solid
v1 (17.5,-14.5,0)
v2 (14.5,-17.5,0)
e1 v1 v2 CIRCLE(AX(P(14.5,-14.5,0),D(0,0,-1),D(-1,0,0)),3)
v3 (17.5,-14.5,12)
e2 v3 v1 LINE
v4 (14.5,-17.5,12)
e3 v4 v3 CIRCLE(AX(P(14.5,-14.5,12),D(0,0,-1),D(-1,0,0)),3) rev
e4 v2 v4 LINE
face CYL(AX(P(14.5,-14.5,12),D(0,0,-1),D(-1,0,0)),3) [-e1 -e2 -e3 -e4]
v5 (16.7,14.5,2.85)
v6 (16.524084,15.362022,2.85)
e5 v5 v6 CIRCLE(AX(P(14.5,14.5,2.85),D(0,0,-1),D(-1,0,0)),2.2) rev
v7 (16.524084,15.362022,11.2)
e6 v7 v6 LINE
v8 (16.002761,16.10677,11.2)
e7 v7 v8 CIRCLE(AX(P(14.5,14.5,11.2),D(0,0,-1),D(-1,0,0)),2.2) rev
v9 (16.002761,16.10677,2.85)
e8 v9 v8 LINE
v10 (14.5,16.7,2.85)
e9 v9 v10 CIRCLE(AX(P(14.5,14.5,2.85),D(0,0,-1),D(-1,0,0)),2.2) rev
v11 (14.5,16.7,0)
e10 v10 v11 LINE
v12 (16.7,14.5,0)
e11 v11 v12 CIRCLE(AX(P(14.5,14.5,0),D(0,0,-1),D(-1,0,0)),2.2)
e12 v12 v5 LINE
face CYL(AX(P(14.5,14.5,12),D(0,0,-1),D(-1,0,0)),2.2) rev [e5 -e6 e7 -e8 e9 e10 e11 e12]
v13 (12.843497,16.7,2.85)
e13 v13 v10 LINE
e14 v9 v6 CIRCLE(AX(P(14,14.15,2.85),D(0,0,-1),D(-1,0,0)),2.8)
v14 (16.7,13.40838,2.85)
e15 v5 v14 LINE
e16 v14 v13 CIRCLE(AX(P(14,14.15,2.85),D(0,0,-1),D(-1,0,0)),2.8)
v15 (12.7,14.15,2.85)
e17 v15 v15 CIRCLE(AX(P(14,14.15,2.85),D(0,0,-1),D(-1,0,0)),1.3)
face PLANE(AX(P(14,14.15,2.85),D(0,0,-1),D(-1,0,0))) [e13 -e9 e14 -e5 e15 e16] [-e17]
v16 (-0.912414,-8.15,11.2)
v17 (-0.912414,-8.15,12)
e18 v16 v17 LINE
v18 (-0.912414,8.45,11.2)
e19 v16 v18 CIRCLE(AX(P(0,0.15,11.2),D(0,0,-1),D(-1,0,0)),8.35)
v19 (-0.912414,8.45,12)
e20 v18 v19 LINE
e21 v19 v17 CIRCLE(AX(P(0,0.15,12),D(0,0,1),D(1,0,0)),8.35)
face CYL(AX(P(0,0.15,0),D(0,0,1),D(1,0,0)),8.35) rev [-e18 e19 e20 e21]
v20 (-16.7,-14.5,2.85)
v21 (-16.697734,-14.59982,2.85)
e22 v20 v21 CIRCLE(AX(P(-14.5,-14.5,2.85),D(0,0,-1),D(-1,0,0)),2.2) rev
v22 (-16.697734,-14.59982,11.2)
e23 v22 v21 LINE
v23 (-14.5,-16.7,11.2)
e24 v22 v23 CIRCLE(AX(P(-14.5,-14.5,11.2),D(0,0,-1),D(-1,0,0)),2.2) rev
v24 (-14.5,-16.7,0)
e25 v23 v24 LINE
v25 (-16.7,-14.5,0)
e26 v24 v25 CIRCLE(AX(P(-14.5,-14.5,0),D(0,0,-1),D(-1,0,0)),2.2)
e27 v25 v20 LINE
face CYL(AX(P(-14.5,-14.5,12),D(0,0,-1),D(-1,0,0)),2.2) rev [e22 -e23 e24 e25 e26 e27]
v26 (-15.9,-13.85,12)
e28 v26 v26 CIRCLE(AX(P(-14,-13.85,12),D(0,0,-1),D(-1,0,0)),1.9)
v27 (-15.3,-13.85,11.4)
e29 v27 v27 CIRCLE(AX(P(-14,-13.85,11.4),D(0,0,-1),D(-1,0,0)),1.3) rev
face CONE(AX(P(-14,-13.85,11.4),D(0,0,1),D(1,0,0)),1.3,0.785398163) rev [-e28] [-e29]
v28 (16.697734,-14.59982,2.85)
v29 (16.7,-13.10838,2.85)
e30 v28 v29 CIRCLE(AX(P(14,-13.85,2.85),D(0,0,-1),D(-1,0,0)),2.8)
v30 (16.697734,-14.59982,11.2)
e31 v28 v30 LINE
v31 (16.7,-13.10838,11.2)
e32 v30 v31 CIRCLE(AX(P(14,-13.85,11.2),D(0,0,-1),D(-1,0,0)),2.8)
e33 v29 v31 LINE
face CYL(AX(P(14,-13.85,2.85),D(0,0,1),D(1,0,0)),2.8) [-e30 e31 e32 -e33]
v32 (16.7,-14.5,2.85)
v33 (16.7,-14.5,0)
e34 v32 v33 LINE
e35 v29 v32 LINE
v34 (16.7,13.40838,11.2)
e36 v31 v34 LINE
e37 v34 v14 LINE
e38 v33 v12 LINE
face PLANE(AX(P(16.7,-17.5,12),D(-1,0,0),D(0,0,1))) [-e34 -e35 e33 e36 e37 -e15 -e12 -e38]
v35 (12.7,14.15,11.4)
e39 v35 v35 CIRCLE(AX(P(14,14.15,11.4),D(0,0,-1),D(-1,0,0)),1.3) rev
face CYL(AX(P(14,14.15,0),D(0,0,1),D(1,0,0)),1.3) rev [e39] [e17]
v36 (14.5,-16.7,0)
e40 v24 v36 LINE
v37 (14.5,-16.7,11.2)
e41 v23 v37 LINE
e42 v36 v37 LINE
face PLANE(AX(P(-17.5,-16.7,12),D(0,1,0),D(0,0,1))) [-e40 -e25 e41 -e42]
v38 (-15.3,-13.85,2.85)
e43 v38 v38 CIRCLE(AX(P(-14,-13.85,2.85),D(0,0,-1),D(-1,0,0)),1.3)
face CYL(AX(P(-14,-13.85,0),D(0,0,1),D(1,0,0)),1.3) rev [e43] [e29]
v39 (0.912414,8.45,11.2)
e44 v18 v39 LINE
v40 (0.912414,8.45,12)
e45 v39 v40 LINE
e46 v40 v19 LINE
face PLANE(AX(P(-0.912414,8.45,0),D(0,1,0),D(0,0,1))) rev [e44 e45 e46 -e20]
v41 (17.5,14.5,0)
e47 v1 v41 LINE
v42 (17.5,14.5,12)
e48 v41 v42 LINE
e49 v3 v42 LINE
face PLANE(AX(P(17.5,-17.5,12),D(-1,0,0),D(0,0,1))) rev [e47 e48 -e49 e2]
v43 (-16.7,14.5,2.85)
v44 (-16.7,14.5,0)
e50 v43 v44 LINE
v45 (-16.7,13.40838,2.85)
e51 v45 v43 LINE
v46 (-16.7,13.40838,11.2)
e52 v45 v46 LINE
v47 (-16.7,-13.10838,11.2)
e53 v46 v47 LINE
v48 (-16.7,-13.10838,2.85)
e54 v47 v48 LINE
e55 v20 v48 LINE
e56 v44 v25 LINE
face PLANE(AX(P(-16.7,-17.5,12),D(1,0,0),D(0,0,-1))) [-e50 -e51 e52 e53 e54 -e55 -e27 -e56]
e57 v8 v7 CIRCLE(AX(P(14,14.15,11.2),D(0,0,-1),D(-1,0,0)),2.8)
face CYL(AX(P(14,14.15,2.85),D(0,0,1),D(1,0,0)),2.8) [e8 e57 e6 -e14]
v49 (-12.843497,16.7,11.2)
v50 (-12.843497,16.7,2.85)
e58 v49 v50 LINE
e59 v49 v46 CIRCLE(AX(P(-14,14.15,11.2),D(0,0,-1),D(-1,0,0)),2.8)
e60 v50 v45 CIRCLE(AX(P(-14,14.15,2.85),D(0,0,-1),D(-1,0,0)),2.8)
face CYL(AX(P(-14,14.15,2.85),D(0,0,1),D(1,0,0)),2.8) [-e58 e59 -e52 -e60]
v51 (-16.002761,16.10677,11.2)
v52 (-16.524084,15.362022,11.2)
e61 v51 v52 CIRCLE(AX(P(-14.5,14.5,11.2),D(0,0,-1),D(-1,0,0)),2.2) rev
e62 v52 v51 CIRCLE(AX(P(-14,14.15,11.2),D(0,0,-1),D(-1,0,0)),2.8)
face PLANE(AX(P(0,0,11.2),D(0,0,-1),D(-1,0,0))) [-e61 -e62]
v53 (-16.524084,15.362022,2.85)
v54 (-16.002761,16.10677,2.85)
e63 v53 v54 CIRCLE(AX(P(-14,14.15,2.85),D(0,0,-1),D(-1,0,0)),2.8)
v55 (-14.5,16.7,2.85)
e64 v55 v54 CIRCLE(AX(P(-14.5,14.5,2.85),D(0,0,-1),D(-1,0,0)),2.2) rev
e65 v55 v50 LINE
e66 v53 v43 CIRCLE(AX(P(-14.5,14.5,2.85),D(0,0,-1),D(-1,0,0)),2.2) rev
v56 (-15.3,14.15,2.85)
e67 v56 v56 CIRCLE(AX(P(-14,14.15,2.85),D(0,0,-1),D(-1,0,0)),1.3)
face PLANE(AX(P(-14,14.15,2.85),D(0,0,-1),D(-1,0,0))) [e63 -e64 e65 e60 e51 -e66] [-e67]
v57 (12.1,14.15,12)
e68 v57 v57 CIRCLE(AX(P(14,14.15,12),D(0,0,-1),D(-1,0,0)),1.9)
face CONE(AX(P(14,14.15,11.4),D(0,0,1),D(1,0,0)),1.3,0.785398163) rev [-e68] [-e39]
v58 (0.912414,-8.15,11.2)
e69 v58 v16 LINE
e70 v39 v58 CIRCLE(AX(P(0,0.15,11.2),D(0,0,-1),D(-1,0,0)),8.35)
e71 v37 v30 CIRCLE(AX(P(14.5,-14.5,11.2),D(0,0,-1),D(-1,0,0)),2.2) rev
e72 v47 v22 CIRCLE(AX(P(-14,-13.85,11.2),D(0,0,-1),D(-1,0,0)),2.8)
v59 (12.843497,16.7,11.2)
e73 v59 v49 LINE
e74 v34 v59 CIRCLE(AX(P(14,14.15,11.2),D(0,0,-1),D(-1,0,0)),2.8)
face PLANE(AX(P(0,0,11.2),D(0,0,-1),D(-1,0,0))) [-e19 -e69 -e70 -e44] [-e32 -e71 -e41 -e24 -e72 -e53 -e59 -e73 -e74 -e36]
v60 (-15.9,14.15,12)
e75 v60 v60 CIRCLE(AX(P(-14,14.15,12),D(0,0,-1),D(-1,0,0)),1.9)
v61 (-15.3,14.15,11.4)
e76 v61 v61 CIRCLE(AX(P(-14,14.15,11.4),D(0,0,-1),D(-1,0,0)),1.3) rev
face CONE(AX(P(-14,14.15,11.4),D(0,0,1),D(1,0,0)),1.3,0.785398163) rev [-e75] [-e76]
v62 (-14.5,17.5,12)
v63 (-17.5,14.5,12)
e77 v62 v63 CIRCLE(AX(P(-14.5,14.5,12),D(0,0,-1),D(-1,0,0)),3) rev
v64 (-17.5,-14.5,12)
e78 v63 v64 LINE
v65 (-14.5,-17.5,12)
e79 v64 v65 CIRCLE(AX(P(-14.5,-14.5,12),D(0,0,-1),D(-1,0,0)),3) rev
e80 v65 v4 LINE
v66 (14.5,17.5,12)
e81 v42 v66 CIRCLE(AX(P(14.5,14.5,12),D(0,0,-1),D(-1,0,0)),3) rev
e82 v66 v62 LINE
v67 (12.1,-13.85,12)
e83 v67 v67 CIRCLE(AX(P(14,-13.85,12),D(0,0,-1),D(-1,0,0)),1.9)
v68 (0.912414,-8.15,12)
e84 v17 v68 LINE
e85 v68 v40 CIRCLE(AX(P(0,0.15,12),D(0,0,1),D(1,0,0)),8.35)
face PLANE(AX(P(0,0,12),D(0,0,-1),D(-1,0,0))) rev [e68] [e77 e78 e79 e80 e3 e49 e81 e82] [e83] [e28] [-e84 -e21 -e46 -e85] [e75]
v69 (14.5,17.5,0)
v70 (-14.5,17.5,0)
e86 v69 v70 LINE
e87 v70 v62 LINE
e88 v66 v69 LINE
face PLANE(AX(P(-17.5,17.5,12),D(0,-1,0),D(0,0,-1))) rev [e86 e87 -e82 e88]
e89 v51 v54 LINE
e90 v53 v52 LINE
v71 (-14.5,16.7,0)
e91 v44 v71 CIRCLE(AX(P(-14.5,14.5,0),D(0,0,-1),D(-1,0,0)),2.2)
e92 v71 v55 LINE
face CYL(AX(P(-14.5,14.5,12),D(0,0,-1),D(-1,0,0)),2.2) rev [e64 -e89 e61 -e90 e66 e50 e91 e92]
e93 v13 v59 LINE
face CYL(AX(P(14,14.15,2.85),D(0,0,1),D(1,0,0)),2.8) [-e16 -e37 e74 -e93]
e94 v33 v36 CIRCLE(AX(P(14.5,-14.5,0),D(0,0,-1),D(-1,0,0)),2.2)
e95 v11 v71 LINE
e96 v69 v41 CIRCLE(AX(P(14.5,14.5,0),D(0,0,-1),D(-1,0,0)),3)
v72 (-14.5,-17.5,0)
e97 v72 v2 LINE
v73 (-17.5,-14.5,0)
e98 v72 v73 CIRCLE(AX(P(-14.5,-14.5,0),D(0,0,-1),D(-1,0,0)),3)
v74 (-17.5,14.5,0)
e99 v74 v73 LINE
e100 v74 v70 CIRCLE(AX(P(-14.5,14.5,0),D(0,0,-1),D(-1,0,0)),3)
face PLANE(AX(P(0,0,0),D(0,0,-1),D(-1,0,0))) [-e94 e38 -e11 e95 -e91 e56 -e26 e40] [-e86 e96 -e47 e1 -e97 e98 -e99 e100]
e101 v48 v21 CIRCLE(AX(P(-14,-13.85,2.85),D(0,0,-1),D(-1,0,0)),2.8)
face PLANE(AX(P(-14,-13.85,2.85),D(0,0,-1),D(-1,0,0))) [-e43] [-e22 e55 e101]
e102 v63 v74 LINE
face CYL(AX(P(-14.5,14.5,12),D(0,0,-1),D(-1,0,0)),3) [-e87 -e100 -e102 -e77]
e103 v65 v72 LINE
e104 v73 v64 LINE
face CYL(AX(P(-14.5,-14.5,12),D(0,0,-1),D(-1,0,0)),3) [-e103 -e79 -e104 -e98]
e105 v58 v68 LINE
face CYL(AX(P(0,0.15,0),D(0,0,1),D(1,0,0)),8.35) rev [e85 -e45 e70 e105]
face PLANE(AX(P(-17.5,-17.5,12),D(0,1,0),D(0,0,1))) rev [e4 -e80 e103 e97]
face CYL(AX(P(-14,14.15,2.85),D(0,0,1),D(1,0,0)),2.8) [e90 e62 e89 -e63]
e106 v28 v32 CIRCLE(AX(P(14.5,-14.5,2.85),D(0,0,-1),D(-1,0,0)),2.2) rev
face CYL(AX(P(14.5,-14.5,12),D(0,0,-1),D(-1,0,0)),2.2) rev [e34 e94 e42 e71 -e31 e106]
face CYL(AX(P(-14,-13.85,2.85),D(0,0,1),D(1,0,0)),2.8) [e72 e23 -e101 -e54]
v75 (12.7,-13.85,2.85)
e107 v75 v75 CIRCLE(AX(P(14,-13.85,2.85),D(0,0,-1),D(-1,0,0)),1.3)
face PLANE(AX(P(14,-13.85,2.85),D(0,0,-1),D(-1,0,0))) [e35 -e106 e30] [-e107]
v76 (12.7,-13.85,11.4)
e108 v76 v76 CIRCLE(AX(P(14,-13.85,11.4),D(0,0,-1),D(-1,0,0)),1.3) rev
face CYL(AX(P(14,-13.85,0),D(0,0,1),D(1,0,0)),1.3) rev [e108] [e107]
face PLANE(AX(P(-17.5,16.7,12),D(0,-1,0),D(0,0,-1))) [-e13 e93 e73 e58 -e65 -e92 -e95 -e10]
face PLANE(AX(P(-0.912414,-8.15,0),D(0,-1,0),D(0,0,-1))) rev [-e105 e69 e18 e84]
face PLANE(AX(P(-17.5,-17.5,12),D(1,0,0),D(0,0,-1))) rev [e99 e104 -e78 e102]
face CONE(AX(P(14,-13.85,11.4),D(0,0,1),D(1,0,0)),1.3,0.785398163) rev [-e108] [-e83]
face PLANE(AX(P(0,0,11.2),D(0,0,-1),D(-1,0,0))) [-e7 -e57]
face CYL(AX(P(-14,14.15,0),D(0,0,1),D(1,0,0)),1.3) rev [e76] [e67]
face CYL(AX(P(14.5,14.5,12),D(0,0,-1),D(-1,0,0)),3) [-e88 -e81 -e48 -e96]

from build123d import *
from build123d.topology import SkipClean

# Parameters (mm, degrees)
CROQUIS2_W              = 35
CROQUIS2_H              = 35
SALIENTE_EXTRUIR1_DEPTH = 12
REDONDEO1_R             = 3
VACIADO1_T              = -0.8
CORTAR_EXTRUIR3_DEPTH   = 28.504545079
CROQUIS6_R              = 1.3
CORTAR_EXTRUIR4_DEPTH   = 28.504545079
CHAFL_N3_SIZE           = 0.6
CROQUIS7_R              = 2.8
CROQUIS7_R_2            = 1.3
SALIENTE_EXTRUIR2_DEPTH = 8.35


with BuildPart() as part:
    # Croquis2 → Saliente-Extruir1 (new body)
    with BuildSketch(Plane.XY):
        Rectangle(CROQUIS2_W, CROQUIS2_H)
    extrude(amount=SALIENTE_EXTRUIR1_DEPTH)

    # Redondeo1
    redondeo1_edges = [part.edges().sort_by_distance(p)[0] for p in [
        (17.5, -17.5, 6),
        (-17.5, -17.5, 6),
        (-17.5, 17.5, 6),
        (17.5, 17.5, 6),
    ]]
    fillet(redondeo1_edges, radius=REDONDEO1_R)

    # Vaciado1
    vaciado1_openings = [part.faces().sort_by_distance(p)[0] for p in [
        (0, 0, 0),
    ]]
    offset(amount=VACIADO1_T, openings=vaciado1_openings, kind=Kind.INTERSECTION)

    # Croquis5 → Cortar-Extruir3 (cut, through all)
    with BuildSketch(Plane.XY.offset(12)):
        with BuildLine():
            Line((-0.91241438, 8.45), (0.91241438, 8.45))
            ThreePointArc((0.91241438, 8.45), (8.35, 0.15), (0.91241438, -8.15))
            Line((0.91241438, -8.15), (-0.91241438, -8.15))
            ThreePointArc((-0.91241438, -8.15), (-8.35, 0.15), (-0.91241438, 8.45))
        make_face()
    extrude(amount=-CORTAR_EXTRUIR3_DEPTH, mode=Mode.SUBTRACT)

    # Croquis6 → Cortar-Extruir4 (cut, through all)
    with BuildSketch(Plane.XY.offset(12)):
        with Locations((-14, 14.15)):
            Circle(CROQUIS6_R)
        with Locations((14, 14.15)):
            Circle(CROQUIS6_R)
        with Locations((14, -13.85)):
            Circle(CROQUIS6_R)
        with Locations((-14, -13.85)):
            Circle(CROQUIS6_R)
    extrude(amount=-CORTAR_EXTRUIR4_DEPTH, mode=Mode.SUBTRACT)

    # Chaflán3
    chafl_n3_edges = [part.edges().sort_by_distance(p)[0] for p in [
        (-15.3, -13.85, 12),
        (12.7, -13.85, 12),
        (12.7, 14.15, 12),
        (-15.3, 14.15, 12),
    ]]
    chamfer(chafl_n3_edges, length=CHAFL_N3_SIZE)

    # Croquis7 → Saliente-Extruir2 (add)
    # profile 1 of 4: a face of its own
    with SkipClean():  # the faces are left unmerged after this step: merging them gives an invalid solid
        with BuildSketch(Plane(origin=(0, 0, 11.2), x_dir=(-1, 0, 0), z_dir=(0, 0, -1))):
            with Locations((-14, 14.15)):
                Circle(CROQUIS7_R)
            with Locations((-14, 14.15)):
                Circle(CROQUIS7_R_2, mode=Mode.SUBTRACT)
        # profile 2 of 4: a face of its own
        with BuildSketch(Plane(origin=(0, 0, 11.2), x_dir=(-1, 0, 0), z_dir=(0, 0, -1))):
            with Locations((14, 14.15)):
                Circle(CROQUIS7_R)
            with Locations((14, 14.15)):
                Circle(CROQUIS7_R_2, mode=Mode.SUBTRACT)
        # profile 3 of 4: a face of its own
        with BuildSketch(Plane(origin=(0, 0, 11.2), x_dir=(-1, 0, 0), z_dir=(0, 0, -1))):
            with Locations((14, -13.85)):
                Circle(CROQUIS7_R)
            with Locations((14, -13.85)):
                Circle(CROQUIS7_R_2, mode=Mode.SUBTRACT)
        # profile 4 of 4: a face of its own
        with BuildSketch(Plane(origin=(0, 0, 11.2), x_dir=(-1, 0, 0), z_dir=(0, 0, -1))):
            with Locations((-14, -13.85)):
                Circle(CROQUIS7_R)
            with Locations((-14, -13.85)):
                Circle(CROQUIS7_R_2, mode=Mode.SUBTRACT)
        extrude(amount=SALIENTE_EXTRUIR2_DEPTH)


solid = part.part
